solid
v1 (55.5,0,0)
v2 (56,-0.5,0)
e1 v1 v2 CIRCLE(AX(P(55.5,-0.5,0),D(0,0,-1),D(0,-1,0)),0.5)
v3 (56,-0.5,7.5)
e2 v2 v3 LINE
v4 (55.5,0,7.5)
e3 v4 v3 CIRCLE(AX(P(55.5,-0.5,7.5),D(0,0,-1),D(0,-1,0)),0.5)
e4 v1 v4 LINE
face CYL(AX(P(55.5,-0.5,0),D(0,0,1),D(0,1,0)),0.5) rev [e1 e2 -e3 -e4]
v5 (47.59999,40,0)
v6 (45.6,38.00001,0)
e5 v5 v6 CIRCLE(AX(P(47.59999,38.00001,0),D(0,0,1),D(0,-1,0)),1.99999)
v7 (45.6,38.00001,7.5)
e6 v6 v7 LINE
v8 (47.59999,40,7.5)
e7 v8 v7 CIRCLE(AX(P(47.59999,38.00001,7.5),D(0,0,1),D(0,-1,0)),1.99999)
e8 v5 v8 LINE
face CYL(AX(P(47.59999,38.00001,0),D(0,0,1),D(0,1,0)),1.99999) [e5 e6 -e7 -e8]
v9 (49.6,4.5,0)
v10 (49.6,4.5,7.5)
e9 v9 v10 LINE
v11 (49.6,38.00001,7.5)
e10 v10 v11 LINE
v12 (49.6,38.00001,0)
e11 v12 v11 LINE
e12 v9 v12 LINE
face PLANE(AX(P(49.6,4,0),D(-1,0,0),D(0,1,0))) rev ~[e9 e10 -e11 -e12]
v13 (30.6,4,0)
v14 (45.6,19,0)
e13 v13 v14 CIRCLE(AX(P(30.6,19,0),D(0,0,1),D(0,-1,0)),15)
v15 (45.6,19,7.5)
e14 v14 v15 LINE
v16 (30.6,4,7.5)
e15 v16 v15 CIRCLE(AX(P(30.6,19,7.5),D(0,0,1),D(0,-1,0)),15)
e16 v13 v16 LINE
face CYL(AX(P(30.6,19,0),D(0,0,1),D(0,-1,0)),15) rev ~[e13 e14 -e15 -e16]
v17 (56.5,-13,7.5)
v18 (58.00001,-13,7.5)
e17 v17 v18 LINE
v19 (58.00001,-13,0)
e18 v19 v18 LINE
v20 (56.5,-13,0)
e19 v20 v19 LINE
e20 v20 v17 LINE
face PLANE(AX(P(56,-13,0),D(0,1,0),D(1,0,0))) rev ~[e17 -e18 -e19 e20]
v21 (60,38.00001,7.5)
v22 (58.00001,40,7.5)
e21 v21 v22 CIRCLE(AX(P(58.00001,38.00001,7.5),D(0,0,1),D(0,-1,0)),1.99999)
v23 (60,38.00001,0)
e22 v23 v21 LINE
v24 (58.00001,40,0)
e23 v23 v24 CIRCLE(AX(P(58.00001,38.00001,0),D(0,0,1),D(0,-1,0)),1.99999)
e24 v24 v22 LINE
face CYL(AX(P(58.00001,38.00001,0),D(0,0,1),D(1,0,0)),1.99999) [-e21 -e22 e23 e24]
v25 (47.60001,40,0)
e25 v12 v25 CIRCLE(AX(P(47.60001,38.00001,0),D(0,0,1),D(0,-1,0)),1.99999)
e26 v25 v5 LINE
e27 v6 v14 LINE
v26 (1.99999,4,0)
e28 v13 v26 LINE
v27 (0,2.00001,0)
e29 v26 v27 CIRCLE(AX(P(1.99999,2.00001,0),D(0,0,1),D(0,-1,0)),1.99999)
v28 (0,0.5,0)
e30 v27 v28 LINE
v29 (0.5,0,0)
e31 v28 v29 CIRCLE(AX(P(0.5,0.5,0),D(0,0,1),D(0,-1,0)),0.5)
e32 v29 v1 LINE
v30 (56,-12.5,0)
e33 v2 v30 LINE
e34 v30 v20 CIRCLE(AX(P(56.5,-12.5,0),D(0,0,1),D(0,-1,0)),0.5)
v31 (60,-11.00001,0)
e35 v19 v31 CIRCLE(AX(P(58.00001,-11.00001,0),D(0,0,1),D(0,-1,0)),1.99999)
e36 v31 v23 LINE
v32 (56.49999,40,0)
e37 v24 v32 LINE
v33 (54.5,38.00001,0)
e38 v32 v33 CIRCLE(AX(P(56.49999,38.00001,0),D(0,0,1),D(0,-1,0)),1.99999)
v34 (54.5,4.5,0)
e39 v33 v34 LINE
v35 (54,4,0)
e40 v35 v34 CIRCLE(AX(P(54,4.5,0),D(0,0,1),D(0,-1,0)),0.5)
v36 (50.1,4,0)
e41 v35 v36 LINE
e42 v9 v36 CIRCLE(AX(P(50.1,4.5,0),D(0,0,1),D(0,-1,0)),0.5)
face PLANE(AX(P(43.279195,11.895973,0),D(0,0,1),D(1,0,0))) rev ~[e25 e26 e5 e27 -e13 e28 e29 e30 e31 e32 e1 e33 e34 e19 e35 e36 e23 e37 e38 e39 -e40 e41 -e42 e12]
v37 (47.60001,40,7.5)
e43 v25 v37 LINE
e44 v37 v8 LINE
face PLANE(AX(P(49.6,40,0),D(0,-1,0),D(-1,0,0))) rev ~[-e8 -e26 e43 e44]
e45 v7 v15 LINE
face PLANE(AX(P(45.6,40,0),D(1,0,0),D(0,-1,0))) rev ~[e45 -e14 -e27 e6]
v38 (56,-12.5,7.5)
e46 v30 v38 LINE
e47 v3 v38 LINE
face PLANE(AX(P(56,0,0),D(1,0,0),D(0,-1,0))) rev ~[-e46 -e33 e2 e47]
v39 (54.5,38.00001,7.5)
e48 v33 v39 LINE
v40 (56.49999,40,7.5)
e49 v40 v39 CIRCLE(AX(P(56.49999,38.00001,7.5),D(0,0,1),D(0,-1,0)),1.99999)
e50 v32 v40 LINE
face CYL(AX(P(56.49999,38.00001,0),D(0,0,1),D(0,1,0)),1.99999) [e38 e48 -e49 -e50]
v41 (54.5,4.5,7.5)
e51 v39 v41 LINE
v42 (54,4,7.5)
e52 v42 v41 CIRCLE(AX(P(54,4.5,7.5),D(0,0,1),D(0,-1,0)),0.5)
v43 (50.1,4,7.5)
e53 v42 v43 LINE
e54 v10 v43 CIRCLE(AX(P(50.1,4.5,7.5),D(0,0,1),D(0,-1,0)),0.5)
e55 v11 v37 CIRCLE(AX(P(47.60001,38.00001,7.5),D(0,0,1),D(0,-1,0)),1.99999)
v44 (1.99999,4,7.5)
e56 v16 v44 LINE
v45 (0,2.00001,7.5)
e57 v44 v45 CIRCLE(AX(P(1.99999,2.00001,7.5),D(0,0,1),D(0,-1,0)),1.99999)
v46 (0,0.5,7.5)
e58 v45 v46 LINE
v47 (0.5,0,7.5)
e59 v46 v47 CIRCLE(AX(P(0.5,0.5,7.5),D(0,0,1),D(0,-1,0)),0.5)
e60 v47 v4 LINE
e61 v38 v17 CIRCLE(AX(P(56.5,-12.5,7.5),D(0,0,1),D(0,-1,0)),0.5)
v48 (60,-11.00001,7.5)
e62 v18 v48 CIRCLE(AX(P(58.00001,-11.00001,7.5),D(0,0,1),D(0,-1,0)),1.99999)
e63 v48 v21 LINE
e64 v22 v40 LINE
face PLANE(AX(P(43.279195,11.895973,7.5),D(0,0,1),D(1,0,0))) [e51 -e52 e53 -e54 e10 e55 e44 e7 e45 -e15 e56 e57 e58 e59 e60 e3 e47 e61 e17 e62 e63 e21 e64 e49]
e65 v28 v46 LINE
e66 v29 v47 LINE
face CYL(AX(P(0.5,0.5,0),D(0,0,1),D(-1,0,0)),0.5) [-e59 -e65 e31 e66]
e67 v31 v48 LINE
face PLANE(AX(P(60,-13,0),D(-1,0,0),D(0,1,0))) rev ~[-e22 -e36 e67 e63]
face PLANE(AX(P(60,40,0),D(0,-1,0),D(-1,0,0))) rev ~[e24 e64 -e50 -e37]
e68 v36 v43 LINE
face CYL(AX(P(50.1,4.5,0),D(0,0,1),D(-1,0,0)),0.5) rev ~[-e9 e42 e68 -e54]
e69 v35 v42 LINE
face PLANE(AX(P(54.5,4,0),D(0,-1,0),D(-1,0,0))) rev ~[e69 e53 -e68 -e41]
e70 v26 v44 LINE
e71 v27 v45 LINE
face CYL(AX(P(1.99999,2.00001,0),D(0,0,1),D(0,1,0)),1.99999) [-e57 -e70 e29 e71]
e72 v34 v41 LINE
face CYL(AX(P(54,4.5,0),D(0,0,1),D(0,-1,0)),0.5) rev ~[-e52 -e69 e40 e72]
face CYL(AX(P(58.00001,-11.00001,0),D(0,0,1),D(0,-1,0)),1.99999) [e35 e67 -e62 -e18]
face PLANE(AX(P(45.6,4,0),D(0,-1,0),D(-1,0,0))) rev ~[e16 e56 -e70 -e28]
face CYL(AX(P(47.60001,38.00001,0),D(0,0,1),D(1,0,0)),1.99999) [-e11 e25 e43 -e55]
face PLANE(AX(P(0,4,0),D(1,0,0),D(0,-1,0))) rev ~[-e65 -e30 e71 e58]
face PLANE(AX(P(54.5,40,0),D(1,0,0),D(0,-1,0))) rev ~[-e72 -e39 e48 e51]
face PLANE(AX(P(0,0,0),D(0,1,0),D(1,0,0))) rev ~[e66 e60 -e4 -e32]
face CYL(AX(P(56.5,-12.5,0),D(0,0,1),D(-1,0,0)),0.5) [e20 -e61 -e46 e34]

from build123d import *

# Parameters (mm, degrees)
F1_DEPTH = 7.5
F2_R     = 1.99999
F3_R     = 15
F4_R     = 0.5


# Not quite as in the source:
# - a fillet or chamfer is up to 0.001 mm smaller than in the source, because OpenCascade refuses the exact size


with BuildPart() as f1:
    # F0 (on Top) → F1 (new body)
    with BuildSketch(Plane.XY):
        Polygon((45.6, 4), (0, 4), (0, 0), (56, 0), (56, -13), (60, -13), (60, 40), (54.5, 40), (54.5, 4), (49.6, 4), (49.6, 40), (45.6, 40), align=None)
    extrude(amount=F1_DEPTH)

    # F2 (radius 2 in the source; OpenCascade refuses exactly that, so slightly less here)
    f2_edges = [f1.edges().sort_by_distance(p)[0] for p in [
        (60, -13, 3.75),
        (60, 40, 3.75),
        (54.5, 40, 3.75),
        (49.6, 40, 3.75),
        (45.6, 40, 3.75),
        (0, 4, 3.75),
    ]]
    fillet(f2_edges, radius=F2_R)

    # F3
    f3_edges = [f1.edges().sort_by_distance(p)[0] for p in [
        (45.6, 4, 3.75),
    ]]
    fillet(f3_edges, radius=F3_R)

    # F4
    f4_edges = [f1.edges().sort_by_distance(p)[0] for p in [
        (49.6, 4, 3.75),
        (54.5, 4, 3.75),
        (0, 0, 3.75),
        (56, -13, 3.75),
        (56, 0, 3.75),
    ]]
    fillet(f4_edges, radius=F4_R)


solid = f1.part
